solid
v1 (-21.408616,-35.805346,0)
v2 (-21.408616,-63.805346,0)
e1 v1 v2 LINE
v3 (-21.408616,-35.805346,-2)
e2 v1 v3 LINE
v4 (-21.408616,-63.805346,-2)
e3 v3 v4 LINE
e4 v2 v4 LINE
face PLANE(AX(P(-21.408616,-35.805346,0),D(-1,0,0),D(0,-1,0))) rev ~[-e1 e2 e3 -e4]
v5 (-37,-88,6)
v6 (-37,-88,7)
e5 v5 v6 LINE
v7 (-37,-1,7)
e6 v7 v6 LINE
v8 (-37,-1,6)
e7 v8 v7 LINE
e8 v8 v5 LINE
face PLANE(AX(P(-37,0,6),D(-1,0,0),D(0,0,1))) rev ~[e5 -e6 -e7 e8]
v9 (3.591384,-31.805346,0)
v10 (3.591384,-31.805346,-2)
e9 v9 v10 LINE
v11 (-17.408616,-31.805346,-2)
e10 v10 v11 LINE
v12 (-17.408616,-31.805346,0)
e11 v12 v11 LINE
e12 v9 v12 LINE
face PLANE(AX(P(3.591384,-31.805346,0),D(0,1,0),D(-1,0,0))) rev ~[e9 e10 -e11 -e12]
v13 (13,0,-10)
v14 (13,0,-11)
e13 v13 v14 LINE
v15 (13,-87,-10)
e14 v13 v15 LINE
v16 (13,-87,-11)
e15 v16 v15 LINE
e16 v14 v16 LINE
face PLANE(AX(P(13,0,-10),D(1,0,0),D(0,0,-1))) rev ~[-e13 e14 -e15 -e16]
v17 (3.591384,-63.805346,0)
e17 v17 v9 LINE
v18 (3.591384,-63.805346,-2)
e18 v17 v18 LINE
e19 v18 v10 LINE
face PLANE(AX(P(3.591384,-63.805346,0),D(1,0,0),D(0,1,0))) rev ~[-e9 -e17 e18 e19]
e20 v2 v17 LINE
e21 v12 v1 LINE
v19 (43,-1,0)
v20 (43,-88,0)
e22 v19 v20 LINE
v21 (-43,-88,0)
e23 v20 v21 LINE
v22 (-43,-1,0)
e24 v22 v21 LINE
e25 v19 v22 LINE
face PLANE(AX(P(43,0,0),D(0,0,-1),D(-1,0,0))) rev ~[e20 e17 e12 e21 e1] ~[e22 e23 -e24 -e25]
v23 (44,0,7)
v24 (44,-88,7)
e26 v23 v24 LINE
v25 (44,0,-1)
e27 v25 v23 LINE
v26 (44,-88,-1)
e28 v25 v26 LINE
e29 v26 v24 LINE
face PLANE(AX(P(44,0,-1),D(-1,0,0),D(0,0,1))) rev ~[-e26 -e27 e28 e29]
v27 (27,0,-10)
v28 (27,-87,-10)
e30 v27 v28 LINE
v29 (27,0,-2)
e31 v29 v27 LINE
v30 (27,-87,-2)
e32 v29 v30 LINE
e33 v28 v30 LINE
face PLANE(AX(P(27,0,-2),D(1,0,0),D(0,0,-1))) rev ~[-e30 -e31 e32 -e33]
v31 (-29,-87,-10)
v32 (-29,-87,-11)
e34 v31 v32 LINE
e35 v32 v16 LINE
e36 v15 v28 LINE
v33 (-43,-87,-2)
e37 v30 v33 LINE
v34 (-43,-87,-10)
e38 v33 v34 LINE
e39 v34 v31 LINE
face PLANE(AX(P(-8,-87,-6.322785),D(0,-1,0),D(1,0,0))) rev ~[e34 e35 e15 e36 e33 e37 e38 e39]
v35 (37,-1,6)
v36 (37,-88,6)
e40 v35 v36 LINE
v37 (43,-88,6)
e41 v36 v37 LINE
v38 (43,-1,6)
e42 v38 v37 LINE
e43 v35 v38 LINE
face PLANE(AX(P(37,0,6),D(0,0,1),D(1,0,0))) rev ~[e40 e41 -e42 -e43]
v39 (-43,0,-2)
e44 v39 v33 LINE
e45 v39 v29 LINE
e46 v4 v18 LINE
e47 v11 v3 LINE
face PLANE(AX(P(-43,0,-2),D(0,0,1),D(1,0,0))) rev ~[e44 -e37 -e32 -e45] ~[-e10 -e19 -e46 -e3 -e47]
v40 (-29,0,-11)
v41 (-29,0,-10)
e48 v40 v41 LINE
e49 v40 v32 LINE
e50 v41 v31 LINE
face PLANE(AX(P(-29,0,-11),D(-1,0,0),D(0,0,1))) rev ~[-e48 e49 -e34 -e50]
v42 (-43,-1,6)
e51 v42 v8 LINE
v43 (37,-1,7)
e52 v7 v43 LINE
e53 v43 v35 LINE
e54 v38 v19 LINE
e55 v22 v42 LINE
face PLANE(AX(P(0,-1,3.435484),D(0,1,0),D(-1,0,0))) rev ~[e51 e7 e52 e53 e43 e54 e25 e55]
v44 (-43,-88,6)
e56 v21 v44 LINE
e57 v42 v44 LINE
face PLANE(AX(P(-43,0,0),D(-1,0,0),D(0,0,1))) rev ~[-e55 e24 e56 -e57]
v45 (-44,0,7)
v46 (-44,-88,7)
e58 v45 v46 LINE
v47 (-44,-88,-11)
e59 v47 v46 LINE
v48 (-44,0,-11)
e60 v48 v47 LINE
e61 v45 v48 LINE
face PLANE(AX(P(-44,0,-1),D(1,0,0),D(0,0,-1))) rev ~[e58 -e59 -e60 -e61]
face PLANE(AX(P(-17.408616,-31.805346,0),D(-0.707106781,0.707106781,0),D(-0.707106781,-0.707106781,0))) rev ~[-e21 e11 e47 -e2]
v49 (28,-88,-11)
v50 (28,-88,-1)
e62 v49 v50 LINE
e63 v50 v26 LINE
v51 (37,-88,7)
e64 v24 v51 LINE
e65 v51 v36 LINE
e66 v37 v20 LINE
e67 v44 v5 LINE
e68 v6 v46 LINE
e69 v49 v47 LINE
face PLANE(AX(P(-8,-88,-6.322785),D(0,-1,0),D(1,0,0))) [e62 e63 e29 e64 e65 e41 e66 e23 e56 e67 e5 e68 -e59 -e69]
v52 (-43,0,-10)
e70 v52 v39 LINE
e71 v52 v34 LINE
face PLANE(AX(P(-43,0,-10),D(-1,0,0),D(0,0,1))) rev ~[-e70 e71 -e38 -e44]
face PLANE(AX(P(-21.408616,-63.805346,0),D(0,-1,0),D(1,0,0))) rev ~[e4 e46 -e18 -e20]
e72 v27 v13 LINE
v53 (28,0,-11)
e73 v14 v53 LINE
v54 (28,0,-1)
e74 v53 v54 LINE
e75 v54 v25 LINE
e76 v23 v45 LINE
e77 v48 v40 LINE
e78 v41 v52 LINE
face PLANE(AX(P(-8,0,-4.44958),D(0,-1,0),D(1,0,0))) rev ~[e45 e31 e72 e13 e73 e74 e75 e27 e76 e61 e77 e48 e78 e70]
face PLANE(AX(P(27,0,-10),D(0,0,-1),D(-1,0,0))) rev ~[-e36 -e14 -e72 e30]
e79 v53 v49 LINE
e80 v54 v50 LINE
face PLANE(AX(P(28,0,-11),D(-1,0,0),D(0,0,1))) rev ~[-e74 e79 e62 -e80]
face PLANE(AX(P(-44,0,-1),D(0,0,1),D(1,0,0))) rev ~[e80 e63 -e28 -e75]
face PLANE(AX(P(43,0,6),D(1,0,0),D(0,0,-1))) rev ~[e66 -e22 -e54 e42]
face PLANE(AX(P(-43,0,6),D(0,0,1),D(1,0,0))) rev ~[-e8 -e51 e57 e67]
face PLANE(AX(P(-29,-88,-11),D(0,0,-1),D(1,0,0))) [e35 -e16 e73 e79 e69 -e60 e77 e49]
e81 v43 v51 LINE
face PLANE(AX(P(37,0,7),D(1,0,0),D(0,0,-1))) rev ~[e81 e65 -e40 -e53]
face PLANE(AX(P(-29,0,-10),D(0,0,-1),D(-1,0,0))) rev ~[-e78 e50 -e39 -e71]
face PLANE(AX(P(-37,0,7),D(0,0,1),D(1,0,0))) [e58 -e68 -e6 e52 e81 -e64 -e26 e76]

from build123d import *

# Parameters (mm, degrees)
F1_DEPTH = 88
F3_DEPTH = 1
F4_DEPTH = 88
F6_DEPTH = 1
F8_DEPTH = 2


with BuildPart() as f1:
    # F0 (on Front) → F1 (new body)
    with BuildSketch(Plane.XZ):
        Polygon((43, 0), (0, 0), (-43, 0), (-43, 6), (-37, 6), (-37, 7), (-44, 7), (-44, -1), (0, -1), (28, -1), (44, -1), (44, 7), (37, 7), (37, 6), (43, 6), align=None)
    extrude(amount=F1_DEPTH)

    # F2 (on face) → F3 (join)
    with BuildSketch(Plane(origin=(0, 0, 0), x_dir=(-1, 0, 0), z_dir=(0, 1, 0))):
        Polygon((37, 7), (-37, 7), (-37, 6), (-43, 6), (-43, 0), (43, 0), (43, 6), (37, 6), align=None)
    extrude(amount=-F3_DEPTH)

    # F0 (on Front) → F4 (join)
    with BuildSketch(Plane.XZ):
        Polygon((0, -1), (-44, -1), (-44, -11), (-29, -11), (-29, -10), (-43, -10), (-43, -2), (0, -2), (27, -2), (27, -10), (13, -10), (13, -11), (28, -11), (28, -2), (28, -1), align=None)
    extrude(amount=F4_DEPTH)

    # F5 (on face) → F6 (join)
    with BuildSketch(Plane.XZ.offset(88)):
        Polygon((-29, -10), (-29, -11), (13, -11), (13, -10), (27, -10), (27, -2), (-43, -2), (-43, -10), align=None)
    extrude(amount=-F6_DEPTH)

    # F7 (on Top) → F8 (cut)
    with BuildSketch(Plane.XY):
        Polygon((-21.4086160213, -63.8053458929), (3.5913839787, -63.8053458929), (3.5913839787, -31.8053458929), (-17.4086160213, -31.8053458929), (-21.4086160213, -35.8053458929), align=None)
    extrude(amount=-F8_DEPTH, mode=Mode.SUBTRACT)


solid = f1.part
